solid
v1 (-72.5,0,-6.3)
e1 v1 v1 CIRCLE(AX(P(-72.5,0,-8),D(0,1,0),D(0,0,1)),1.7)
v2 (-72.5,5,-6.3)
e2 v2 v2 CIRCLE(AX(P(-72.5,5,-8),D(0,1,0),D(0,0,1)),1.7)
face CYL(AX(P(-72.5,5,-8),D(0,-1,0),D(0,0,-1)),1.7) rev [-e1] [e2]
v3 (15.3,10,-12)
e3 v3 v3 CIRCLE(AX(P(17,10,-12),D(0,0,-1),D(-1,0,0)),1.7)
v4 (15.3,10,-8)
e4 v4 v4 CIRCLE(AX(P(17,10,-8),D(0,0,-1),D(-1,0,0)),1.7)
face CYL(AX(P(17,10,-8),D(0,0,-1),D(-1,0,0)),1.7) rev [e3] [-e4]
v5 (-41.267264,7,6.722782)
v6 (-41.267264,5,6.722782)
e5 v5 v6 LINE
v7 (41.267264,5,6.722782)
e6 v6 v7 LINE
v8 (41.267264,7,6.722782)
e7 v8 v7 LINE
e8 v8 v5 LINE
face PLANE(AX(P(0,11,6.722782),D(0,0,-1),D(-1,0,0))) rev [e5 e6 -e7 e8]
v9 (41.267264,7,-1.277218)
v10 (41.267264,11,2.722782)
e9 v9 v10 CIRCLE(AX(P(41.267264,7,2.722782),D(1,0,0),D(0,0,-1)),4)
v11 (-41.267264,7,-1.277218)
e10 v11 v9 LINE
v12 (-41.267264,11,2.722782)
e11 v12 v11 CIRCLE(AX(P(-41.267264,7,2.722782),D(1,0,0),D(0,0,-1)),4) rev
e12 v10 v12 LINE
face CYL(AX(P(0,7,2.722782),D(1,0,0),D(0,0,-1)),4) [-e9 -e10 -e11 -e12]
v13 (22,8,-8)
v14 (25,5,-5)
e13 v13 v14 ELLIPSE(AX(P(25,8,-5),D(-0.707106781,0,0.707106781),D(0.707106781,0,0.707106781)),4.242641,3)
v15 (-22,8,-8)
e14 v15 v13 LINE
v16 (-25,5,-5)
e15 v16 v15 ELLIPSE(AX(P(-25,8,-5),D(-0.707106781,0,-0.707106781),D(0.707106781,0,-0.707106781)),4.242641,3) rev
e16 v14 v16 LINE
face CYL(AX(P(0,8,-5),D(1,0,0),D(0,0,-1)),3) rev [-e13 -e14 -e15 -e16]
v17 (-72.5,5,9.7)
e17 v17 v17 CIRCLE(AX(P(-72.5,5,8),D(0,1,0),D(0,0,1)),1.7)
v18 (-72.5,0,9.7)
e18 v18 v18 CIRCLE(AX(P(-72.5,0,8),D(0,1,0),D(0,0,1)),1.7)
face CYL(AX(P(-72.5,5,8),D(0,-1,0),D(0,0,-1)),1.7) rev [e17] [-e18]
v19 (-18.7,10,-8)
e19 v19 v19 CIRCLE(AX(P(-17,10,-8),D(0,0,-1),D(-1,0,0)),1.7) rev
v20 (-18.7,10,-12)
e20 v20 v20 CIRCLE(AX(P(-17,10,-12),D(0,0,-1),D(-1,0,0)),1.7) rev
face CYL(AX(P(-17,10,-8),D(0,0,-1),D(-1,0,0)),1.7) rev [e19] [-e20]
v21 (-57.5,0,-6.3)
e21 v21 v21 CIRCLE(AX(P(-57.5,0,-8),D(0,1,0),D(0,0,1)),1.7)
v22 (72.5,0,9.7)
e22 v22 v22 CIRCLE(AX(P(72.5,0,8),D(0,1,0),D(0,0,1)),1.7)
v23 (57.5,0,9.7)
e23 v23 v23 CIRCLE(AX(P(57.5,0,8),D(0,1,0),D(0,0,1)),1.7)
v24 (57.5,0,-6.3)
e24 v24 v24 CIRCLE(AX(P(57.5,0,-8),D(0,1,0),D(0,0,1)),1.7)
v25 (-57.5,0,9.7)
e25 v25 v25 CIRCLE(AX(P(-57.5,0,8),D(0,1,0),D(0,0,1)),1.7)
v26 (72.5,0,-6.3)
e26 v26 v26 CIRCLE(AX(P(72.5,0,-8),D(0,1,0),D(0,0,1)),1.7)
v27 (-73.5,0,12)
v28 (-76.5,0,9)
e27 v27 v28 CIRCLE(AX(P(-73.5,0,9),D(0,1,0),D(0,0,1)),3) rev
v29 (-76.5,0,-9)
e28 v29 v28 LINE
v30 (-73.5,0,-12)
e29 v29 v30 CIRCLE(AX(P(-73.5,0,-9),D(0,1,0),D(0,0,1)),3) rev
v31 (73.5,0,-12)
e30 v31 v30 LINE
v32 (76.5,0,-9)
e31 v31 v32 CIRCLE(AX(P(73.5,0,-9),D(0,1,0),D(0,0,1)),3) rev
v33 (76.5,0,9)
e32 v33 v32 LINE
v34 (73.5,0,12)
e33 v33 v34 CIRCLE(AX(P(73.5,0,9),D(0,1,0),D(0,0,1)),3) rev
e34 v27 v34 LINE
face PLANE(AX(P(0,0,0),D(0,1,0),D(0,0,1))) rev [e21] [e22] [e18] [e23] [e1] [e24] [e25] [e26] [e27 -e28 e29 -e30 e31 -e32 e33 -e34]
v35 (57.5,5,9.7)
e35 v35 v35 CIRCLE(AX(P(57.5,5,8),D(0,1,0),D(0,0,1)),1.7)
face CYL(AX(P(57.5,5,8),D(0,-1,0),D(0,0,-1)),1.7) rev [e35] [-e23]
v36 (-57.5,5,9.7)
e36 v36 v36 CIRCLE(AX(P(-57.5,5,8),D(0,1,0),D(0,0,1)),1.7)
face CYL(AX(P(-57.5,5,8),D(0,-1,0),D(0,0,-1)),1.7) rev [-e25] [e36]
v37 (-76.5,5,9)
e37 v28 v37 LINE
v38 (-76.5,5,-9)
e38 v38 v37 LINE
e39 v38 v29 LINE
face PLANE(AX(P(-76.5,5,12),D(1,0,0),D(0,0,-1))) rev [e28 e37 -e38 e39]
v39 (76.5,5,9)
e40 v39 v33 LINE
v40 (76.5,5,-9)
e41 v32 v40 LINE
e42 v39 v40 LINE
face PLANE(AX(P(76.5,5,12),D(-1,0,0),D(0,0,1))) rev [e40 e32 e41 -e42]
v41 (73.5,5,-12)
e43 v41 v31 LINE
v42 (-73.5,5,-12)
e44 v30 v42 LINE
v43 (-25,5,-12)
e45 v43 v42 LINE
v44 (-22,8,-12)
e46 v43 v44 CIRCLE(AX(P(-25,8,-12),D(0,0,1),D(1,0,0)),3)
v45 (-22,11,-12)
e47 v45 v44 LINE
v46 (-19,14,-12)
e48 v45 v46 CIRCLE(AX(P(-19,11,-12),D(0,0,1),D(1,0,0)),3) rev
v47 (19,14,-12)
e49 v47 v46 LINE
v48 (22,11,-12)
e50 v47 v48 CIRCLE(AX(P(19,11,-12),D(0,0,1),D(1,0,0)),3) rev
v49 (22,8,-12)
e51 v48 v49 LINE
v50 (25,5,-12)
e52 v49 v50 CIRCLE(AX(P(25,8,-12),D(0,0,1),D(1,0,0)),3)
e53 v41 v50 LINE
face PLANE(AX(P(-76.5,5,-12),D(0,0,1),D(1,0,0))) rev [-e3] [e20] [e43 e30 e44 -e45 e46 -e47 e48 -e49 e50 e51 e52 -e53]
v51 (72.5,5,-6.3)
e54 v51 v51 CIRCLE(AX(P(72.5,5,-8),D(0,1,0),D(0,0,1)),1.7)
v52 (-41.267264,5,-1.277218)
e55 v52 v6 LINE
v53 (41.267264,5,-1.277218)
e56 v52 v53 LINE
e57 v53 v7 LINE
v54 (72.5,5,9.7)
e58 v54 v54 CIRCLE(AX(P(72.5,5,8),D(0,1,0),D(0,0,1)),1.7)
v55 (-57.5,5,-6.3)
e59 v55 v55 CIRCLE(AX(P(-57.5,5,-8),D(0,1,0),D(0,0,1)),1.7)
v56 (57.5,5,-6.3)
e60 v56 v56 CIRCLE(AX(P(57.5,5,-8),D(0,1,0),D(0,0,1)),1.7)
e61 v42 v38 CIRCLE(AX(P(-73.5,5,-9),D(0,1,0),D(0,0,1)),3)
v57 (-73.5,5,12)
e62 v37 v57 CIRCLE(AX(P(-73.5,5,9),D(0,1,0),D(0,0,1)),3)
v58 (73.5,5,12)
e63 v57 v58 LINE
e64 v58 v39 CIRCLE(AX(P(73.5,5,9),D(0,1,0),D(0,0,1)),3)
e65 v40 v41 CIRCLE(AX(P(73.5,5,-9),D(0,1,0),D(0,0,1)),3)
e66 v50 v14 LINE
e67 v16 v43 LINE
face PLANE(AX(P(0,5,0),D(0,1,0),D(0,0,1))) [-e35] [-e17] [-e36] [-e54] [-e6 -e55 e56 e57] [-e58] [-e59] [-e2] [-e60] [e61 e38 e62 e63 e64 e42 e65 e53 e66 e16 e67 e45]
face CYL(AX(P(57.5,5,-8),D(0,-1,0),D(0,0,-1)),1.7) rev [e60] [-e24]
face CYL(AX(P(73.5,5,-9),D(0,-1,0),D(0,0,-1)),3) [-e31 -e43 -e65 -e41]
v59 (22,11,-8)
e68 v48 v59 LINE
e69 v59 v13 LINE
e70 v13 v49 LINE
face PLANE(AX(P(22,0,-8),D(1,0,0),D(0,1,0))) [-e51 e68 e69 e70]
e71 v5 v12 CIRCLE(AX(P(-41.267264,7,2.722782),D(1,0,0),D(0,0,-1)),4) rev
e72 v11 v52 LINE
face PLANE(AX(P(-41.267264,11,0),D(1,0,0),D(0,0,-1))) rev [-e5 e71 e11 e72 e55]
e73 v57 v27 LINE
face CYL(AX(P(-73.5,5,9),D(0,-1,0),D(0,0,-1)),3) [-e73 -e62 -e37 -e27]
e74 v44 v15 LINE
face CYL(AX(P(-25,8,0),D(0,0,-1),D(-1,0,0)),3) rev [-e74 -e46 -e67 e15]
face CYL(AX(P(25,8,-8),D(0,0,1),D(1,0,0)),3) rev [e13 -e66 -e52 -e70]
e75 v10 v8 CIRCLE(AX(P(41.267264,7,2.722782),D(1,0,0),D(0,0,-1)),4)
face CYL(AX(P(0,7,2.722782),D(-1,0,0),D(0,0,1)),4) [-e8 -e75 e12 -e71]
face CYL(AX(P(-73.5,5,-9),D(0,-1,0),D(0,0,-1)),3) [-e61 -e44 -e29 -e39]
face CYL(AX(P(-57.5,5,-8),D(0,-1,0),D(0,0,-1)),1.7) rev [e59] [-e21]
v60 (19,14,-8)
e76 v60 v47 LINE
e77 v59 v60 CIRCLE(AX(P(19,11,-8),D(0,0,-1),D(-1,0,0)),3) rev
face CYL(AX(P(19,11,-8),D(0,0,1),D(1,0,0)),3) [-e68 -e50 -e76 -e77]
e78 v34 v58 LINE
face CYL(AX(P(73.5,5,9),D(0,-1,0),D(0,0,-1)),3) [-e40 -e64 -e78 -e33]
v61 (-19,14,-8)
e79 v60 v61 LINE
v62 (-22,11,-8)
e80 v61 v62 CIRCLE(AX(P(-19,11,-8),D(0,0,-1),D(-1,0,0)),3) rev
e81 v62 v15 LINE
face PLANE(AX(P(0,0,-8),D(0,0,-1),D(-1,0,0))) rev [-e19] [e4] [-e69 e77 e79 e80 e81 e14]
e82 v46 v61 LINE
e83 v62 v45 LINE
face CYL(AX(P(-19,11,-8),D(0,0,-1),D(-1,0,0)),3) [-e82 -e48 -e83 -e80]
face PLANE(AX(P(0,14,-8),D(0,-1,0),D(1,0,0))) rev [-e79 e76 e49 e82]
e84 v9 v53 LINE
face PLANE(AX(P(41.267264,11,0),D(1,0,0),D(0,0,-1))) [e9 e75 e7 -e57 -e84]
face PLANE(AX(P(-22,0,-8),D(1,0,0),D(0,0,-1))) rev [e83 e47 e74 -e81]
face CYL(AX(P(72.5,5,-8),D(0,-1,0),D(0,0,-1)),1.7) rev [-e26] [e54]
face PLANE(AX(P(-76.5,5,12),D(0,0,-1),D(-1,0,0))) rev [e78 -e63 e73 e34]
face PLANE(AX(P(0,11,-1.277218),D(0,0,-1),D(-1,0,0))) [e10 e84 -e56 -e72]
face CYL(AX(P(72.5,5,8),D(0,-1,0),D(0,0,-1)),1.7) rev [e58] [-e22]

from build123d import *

# Parameters (mm, degrees)
SKETCH1_R           = 1.7
BOSS_EXTRUDE1_DEPTH = 5
FILLET1_R           = 3
SKETCH2_W           = 82.534528382
SKETCH2_H           = 8
BOSS_EXTRUDE2_DEPTH = 6
FILLET2_R           = 4
SKETCH3_W           = 22
SKETCH3_H           = 9
BOSS_EXTRUDE3_DEPTH = 4
FILLET3_R           = 3
SKETCH4_R           = 1.7
CUT_EXTRUDE2_DEPTH  = 4
FILLET4_R           = 3
FILLET5_R           = 3


with BuildPart() as part:
    # Sketch1 → Boss-Extrude1 (new body)
    with BuildSketch(Plane(origin=(0, 0, 0), x_dir=(1, 0, 0), z_dir=(0, 1, 0))):
        Polygon((-76.5, -12), (-53.5, -12), (53.5, -12), (76.5, -12), (76.5, 12), (53.5, 12), (-53.5, 12), (-76.5, 12), align=None)
        with Locations(Location((-72.5, 8, 0), (0, 0, 270))):
            Circle(SKETCH1_R, mode=Mode.SUBTRACT)
        with Locations(Location((-57.5, 8, 0), (0, 0, 270))):
            Circle(SKETCH1_R, mode=Mode.SUBTRACT)
        with Locations(Location((-57.5, -8, 0), (0, 0, 270))):
            Circle(SKETCH1_R, mode=Mode.SUBTRACT)
        with Locations(Location((-72.5, -8, 0), (0, 0, 270))):
            Circle(SKETCH1_R, mode=Mode.SUBTRACT)
        with Locations(Location((57.5, 8, 0), (0, 0, 270))):
            Circle(SKETCH1_R, mode=Mode.SUBTRACT)
        with Locations(Location((72.5, 8, 0), (0, 0, 270))):
            Circle(SKETCH1_R, mode=Mode.SUBTRACT)
        with Locations(Location((72.5, -8, 0), (0, 0, 270))):
            Circle(SKETCH1_R, mode=Mode.SUBTRACT)
        with Locations(Location((57.5, -8, 0), (0, 0, 270))):
            Circle(SKETCH1_R, mode=Mode.SUBTRACT)
    extrude(amount=BOSS_EXTRUDE1_DEPTH)

    # Fillet1
    fillet1_edges = [part.edges().sort_by_distance(p)[0] for p in [
        (-76.5, 2.5, 12),
        (-76.5, 2.5, -12),
        (76.5, 2.5, -12),
        (76.5, 2.5, 12),
    ]]
    fillet(fillet1_edges, radius=FILLET1_R)

    # Sketch2 → Boss-Extrude2 (add)
    with BuildSketch(Plane(origin=(0, 5, 0), x_dir=(1, 0, 0), z_dir=(0, 1, 0))):
        with Locations((0, -2.722781506)):
            Rectangle(SKETCH2_W, SKETCH2_H)
    extrude(amount=BOSS_EXTRUDE2_DEPTH)

    # Fillet2
    fillet2_edges = [part.edges().sort_by_distance(p)[0] for p in [
        (0, 11, 6.722781506),
        (0, 11, -1.277218494),
    ]]
    fillet(fillet2_edges, radius=FILLET2_R - 0.0001)  # a hair under: the kernel refuses the full size

    # Sketch3 → Boss-Extrude3 (add)
    with BuildSketch(Plane(origin=(0, 0, -12), x_dir=(-1, 0, 0), z_dir=(0, 0, -1))):
        with Locations((-11, 9.5)):
            Rectangle(SKETCH3_W, SKETCH3_H)
        with Locations((11, 9.5)):
            Rectangle(SKETCH3_W, SKETCH3_H)
    extrude(amount=-BOSS_EXTRUDE3_DEPTH)

    # Fillet3
    fillet3_edges = [part.edges().sort_by_distance(p)[0] for p in [
        (-22, 5, -10),
        (22, 5, -10),
    ]]
    fillet(fillet3_edges, radius=FILLET3_R)

    # Sketch4 → Cut-Extrude2 (cut)
    with BuildSketch(Plane(origin=(0, 0, -12), x_dir=(-1, 0, 0), z_dir=(0, 0, -1))):
        with BuildLine():
            ThreePointArc((-15.3, 10), (-15.797918472, 11.202081528), (-17, 11.7))
            Line((-17, 11.7), (-17, 10))
            Line((-17, 10), (-18.7, 10))
            ThreePointArc((-18.7, 10), (-17, 8.3), (-15.3, 10))
        make_face()
        with BuildLine():
            Line((-17, 10), (-17, 11.7))
            ThreePointArc((-17, 11.7), (-18.202081528, 11.202081528), (-18.7, 10))
            Line((-18.7, 10), (-17, 10))
        make_face()
        with Locations((17, 10)):
            Circle(SKETCH4_R)
    extrude(amount=-CUT_EXTRUDE2_DEPTH, mode=Mode.SUBTRACT)

    # Fillet4
    fillet4_edges = [part.edges().sort_by_distance(p)[0] for p in [
        (22, 14, -10),
        (-22, 14, -10),
    ]]
    fillet(fillet4_edges, radius=FILLET4_R)

    # Fillet5
    fillet5_edges = [part.edges().sort_by_distance(p)[0] for p in [
        (0, 5, -8),
    ]]
    fillet(fillet5_edges, radius=FILLET5_R)


solid = part.part
